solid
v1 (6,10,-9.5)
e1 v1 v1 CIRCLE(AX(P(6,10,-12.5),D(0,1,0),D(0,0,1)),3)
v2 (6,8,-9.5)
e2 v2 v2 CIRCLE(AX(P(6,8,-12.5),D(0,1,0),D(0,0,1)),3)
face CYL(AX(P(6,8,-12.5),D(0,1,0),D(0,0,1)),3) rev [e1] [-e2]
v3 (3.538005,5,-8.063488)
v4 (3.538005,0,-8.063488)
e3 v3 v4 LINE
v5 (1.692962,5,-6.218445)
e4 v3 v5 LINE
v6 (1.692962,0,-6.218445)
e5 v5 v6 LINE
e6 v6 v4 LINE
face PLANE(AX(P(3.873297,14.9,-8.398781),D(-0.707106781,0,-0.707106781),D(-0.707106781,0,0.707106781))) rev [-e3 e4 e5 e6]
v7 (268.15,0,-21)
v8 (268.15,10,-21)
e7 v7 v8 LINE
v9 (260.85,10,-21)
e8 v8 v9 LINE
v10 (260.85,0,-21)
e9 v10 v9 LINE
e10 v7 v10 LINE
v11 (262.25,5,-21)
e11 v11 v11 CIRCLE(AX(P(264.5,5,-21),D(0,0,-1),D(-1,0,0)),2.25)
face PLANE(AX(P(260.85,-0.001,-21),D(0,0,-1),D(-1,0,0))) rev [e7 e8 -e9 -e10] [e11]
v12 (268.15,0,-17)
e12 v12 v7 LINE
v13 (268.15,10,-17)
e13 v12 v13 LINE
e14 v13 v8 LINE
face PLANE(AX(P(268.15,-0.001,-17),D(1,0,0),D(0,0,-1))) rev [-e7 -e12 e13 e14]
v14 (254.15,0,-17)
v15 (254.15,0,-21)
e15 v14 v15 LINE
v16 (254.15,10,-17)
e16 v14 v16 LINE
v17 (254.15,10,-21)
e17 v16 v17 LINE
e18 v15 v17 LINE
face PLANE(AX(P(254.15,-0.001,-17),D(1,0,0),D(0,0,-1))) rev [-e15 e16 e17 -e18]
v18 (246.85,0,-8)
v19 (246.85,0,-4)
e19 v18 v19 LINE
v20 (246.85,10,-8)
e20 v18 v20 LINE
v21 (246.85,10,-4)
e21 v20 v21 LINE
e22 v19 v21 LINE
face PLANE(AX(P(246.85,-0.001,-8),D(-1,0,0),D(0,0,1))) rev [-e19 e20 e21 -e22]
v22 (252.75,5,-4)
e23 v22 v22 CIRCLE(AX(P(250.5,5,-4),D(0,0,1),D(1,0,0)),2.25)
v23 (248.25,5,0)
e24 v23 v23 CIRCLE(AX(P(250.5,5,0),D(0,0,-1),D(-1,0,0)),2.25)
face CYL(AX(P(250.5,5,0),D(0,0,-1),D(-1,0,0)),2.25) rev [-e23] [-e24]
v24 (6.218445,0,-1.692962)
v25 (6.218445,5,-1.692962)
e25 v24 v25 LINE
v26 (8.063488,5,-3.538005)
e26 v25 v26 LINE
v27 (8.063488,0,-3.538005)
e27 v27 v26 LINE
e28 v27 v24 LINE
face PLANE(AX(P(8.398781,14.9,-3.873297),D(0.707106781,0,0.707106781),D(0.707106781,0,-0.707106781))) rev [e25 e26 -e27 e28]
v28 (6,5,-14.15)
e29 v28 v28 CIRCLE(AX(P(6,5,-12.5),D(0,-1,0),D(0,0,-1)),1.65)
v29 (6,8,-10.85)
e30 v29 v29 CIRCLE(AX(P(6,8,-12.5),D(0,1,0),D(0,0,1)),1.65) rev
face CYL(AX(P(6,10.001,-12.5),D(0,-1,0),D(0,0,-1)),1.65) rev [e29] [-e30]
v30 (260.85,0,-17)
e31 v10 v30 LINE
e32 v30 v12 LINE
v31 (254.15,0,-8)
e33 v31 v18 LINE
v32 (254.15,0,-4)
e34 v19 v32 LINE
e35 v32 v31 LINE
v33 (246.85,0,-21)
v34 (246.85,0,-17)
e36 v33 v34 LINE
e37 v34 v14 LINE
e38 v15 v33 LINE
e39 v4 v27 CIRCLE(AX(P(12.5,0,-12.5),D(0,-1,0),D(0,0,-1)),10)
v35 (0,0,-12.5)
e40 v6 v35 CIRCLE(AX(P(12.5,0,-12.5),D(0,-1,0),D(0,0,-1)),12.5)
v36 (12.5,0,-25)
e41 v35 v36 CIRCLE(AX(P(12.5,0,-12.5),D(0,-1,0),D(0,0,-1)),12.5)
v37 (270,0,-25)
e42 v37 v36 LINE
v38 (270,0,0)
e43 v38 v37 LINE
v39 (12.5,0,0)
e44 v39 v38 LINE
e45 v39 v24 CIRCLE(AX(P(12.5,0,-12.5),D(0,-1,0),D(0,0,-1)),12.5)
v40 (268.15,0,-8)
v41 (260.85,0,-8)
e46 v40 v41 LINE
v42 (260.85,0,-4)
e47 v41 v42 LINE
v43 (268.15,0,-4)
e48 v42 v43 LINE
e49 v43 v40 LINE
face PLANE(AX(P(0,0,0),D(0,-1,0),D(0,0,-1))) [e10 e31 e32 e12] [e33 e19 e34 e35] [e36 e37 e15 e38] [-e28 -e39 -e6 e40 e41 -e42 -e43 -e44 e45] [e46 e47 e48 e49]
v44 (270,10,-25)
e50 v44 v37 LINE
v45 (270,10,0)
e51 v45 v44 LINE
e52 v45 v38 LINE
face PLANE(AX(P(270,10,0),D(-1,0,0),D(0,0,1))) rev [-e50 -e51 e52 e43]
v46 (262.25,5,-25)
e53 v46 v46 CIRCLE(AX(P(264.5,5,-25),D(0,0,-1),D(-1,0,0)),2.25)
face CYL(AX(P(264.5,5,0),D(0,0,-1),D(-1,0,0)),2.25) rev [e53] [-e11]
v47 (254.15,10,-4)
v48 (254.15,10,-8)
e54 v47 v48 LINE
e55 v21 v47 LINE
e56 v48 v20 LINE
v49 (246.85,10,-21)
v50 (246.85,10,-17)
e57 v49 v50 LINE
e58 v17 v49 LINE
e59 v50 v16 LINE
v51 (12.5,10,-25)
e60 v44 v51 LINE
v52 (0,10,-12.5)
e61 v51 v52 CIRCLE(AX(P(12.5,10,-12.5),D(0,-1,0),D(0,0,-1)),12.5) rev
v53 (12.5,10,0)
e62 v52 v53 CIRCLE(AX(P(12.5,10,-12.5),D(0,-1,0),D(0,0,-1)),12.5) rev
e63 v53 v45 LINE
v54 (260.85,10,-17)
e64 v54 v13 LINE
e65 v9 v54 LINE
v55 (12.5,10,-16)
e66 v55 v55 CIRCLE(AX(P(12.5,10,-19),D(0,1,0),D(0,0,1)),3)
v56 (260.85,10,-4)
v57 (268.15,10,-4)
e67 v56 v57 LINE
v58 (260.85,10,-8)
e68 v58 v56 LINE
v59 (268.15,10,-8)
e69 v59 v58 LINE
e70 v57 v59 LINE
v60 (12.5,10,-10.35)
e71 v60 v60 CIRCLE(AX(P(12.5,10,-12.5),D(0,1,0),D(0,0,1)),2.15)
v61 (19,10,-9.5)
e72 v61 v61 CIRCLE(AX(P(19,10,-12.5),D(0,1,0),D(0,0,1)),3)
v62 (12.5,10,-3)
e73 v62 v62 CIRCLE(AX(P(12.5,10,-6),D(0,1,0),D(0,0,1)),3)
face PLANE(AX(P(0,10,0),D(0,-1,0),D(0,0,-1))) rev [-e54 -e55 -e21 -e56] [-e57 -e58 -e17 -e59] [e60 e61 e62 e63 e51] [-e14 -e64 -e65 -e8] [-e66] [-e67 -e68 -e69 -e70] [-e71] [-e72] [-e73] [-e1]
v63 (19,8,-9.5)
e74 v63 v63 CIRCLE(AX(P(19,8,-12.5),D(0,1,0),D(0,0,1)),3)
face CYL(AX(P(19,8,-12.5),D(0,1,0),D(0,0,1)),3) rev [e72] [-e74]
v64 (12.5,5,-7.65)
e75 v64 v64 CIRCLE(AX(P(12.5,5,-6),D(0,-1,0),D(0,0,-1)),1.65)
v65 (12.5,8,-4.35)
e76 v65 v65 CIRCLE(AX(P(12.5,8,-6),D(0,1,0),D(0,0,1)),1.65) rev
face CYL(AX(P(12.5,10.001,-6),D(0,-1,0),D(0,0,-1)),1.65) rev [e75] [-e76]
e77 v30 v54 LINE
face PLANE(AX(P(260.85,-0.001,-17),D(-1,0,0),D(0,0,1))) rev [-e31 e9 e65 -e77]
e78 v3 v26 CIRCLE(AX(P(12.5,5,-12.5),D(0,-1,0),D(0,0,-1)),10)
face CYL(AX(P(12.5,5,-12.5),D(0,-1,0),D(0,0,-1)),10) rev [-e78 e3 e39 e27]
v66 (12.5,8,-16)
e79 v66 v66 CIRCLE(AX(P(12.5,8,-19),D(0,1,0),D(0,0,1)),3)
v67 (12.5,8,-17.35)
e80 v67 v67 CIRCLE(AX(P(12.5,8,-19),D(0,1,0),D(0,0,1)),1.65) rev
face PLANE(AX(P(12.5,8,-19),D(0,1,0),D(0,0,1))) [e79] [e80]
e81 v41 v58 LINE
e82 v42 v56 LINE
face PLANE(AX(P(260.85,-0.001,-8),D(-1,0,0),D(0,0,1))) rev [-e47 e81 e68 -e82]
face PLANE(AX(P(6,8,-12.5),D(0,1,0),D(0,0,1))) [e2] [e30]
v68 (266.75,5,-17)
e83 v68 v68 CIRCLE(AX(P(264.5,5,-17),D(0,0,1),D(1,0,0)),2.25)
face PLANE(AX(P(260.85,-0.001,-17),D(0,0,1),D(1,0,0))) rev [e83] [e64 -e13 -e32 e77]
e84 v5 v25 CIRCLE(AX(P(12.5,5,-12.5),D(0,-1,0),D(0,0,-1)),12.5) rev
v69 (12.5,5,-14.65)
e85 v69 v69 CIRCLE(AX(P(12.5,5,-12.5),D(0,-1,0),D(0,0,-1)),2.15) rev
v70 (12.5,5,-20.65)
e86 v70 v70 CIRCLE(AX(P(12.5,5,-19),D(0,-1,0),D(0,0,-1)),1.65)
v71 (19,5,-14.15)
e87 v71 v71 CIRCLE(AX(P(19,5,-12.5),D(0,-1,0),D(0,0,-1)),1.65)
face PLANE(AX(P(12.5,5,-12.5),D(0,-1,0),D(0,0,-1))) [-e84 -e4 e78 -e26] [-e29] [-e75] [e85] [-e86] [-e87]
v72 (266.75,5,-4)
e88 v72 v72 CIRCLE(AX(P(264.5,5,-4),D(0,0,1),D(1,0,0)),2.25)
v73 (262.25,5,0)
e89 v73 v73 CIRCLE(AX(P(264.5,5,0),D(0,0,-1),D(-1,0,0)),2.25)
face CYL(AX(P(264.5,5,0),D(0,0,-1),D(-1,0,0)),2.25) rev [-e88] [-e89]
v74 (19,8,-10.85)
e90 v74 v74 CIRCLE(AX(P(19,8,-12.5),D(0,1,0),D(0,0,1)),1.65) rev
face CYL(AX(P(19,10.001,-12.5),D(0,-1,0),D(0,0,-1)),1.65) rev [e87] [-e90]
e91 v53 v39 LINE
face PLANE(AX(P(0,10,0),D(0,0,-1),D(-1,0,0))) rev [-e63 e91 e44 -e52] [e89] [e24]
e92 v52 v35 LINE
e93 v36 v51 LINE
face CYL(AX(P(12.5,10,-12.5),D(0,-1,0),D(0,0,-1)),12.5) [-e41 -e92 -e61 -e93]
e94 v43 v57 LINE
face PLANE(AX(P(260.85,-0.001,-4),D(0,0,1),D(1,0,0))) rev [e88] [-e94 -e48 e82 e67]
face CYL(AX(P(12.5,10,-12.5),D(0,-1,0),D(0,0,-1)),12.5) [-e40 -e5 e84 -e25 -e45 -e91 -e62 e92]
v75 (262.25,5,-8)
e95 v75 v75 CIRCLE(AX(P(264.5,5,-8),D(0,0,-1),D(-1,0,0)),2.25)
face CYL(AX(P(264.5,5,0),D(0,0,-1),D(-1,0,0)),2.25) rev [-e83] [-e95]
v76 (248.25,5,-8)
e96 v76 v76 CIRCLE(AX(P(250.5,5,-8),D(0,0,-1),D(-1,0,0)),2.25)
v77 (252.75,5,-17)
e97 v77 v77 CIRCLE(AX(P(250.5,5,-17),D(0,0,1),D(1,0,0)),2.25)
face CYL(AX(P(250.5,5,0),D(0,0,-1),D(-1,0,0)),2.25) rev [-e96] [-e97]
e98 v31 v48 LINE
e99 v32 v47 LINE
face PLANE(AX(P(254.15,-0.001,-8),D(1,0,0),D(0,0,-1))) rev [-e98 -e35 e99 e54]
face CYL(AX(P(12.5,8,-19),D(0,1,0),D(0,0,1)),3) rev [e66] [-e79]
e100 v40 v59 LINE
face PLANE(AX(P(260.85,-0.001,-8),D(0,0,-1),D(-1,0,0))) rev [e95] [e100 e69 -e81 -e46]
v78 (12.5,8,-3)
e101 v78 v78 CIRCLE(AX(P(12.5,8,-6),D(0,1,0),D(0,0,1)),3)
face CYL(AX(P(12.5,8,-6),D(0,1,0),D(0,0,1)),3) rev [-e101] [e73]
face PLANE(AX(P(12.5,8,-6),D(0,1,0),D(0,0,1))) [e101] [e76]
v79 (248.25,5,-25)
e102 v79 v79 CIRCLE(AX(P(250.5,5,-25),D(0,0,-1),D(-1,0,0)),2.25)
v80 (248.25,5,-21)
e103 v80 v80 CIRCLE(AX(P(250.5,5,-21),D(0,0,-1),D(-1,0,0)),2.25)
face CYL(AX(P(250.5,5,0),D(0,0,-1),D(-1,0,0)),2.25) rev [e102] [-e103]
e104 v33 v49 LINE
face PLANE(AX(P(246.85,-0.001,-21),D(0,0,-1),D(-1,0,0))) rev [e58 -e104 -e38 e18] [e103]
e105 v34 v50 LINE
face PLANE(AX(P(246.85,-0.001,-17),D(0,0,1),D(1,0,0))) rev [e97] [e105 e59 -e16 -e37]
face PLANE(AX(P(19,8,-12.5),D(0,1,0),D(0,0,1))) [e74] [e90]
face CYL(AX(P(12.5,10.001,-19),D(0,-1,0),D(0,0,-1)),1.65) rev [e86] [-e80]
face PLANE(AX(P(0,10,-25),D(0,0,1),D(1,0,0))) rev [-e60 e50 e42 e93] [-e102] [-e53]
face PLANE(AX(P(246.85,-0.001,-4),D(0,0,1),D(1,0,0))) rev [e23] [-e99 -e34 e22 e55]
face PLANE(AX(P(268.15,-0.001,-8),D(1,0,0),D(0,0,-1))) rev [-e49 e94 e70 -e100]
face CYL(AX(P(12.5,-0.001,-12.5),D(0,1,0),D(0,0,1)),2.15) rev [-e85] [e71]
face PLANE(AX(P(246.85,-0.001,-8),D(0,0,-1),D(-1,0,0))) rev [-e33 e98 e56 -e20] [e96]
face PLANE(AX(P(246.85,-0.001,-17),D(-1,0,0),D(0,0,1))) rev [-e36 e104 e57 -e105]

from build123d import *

# Parameters (mm, degrees)
SKETCH1_W              = 270
SKETCH1_H              = 25
BOSS_EXTRUDE1_DEPTH    = 10
CUT_EXTRUDE1_REACH     = 273.339
SKETCH2_R              = 2.15
FILLET1_R              = 12.5
SKETCH3_R              = 2.25
CUT_EXTRUDE2_DEPTH     = 272.339271024
CUT_EXTRUDE5_REACH     = 273.339
SKETCH5_W              = 7.3
SKETCH5_H              = 4
SKETCH6_R              = 10
CUT_EXTRUDE6_DEPTH     = 5
CUT_EXTRUDE7_REACH     = 273.201
SKETCH7_R              = 1.65
CUT_EXTRUDE8_START     = -3.2
CUT_EXTRUDE8_OUTLINE_W = 6
CUT_EXTRUDE8_OUTLINE_H = 6
CUT_EXTRUDE8_DEPTH     = 6.4
SKETCH9_R              = 3
CUT_EXTRUDE9_DEPTH     = 2


# Read off the part's stored shape, not the designer's step: Cut-Extrude8
with BuildPart() as part:
    # Sketch1 → Boss-Extrude1 (new body)
    with BuildSketch(Plane(origin=(0, 0, 0), x_dir=(1, 0, 0), z_dir=(0, 1, 0))):
        with Locations((135, 12.5)):
            Rectangle(SKETCH1_W, SKETCH1_H)
    extrude(amount=BOSS_EXTRUDE1_DEPTH)

    # Sketch2 → Cut-Extrude1 (cut, up to next)
    with BuildSketch(Plane(origin=(0, 10, 0), x_dir=(1, 0, 0), z_dir=(0, 1, 0)), mode=Mode.PRIVATE) as cut_extrude1_sk1:
        with Locations(Location((12.5, 12.5, 0), (0, 0, 270))):
            Circle(SKETCH2_R)
    cut_extrude1_tool1 = extrude(cut_extrude1_sk1.sketch, amount=-CUT_EXTRUDE1_REACH, mode=Mode.PRIVATE) & part.part
    add(cut_extrude1_tool1.solids().sort_by_distance((12.5, 10, -12.5))[0], mode=Mode.SUBTRACT)

    # Fillet1
    fillet1_edges = [part.edges().sort_by_distance(p)[0] for p in [
        (0, 5, 0),
        (0, 5, -25),
    ]]
    fillet(fillet1_edges, radius=FILLET1_R - 0.0001)  # a hair under: the kernel refuses the full size

    # Sketch3 → Cut-Extrude2 (cut, through all)
    with BuildSketch(Plane(origin=(0, 0, -25), x_dir=(-1, 0, 0), z_dir=(0, 0, -1))):
        with Locations((-264.5, 5)):
            Circle(SKETCH3_R)
        with Locations((-250.5, 5)):
            Circle(SKETCH3_R)
    extrude(amount=-CUT_EXTRUDE2_DEPTH, mode=Mode.SUBTRACT)

    # Sketch5 → Cut-Extrude5 (cut, up to next)
    with BuildSketch(Plane(origin=(0, 10, 0), x_dir=(1, 0, 0), z_dir=(0, 1, 0)), mode=Mode.PRIVATE) as cut_extrude5_sk1:
        with Locations((264.5, 19)):
            Rectangle(SKETCH5_W, SKETCH5_H)
    cut_extrude5_tool1 = extrude(cut_extrude5_sk1.sketch, amount=-CUT_EXTRUDE5_REACH, mode=Mode.PRIVATE) & part.part
    # Sketch5 → Cut-Extrude5 (cut, up to next)
    with BuildSketch(Plane(origin=(0, 10, 0), x_dir=(1, 0, 0), z_dir=(0, 1, 0)), mode=Mode.PRIVATE) as cut_extrude5_sk2:
        with Locations((264.5, 6)):
            Rectangle(SKETCH5_W, SKETCH5_H)
    cut_extrude5_tool2 = extrude(cut_extrude5_sk2.sketch, amount=-CUT_EXTRUDE5_REACH, mode=Mode.PRIVATE) & part.part
    # Sketch5 → Cut-Extrude5 (cut, up to next)
    with BuildSketch(Plane(origin=(0, 10, 0), x_dir=(1, 0, 0), z_dir=(0, 1, 0)), mode=Mode.PRIVATE) as cut_extrude5_sk3:
        with Locations((250.5, 19)):
            Rectangle(SKETCH5_W, SKETCH5_H)
    cut_extrude5_tool3 = extrude(cut_extrude5_sk3.sketch, amount=-CUT_EXTRUDE5_REACH, mode=Mode.PRIVATE) & part.part
    # Sketch5 → Cut-Extrude5 (cut, up to next)
    with BuildSketch(Plane(origin=(0, 10, 0), x_dir=(1, 0, 0), z_dir=(0, 1, 0)), mode=Mode.PRIVATE) as cut_extrude5_sk4:
        with Locations((250.5, 6)):
            Rectangle(SKETCH5_W, SKETCH5_H)
    cut_extrude5_tool4 = extrude(cut_extrude5_sk4.sketch, amount=-CUT_EXTRUDE5_REACH, mode=Mode.PRIVATE) & part.part
    add(cut_extrude5_tool1.solids().sort_by_distance((264.5, 10, -19))[0], mode=Mode.SUBTRACT)
    add(cut_extrude5_tool2.solids().sort_by_distance((264.5, 10, -6))[0], mode=Mode.SUBTRACT)
    add(cut_extrude5_tool3.solids().sort_by_distance((250.5, 10, -19))[0], mode=Mode.SUBTRACT)
    add(cut_extrude5_tool4.solids().sort_by_distance((250.5, 10, -6))[0], mode=Mode.SUBTRACT)

    # Sketch6 → Cut-Extrude6 (cut)
    with BuildSketch(Plane.XZ):
        with Locations(Location((12.5, -12.5, 0), (0, 0, 270))):
            Circle(SKETCH6_R)
    extrude(amount=-CUT_EXTRUDE6_DEPTH, mode=Mode.SUBTRACT)

    # Sketch7 → Cut-Extrude7 (cut, up to next)
    with BuildSketch(Plane.XZ.offset(-5), mode=Mode.PRIVATE) as cut_extrude7_sk1:
        with Locations(Location((12.5, -6, 0), (0, 0, 270))):
            Circle(SKETCH7_R)
    cut_extrude7_tool1 = extrude(cut_extrude7_sk1.sketch, amount=-CUT_EXTRUDE7_REACH, mode=Mode.PRIVATE) & part.part
    # Sketch7 → Cut-Extrude7 (cut, up to next)
    with BuildSketch(Plane.XZ.offset(-5), mode=Mode.PRIVATE) as cut_extrude7_sk2:
        with Locations(Location((19, -12.5, 0), (0, 0, 270))):
            Circle(SKETCH7_R)
    cut_extrude7_tool2 = extrude(cut_extrude7_sk2.sketch, amount=-CUT_EXTRUDE7_REACH, mode=Mode.PRIVATE) & part.part
    # Sketch7 → Cut-Extrude7 (cut, up to next)
    with BuildSketch(Plane.XZ.offset(-5), mode=Mode.PRIVATE) as cut_extrude7_sk3:
        with Locations(Location((12.5, -19, 0), (0, 0, 270))):
            Circle(SKETCH7_R)
    cut_extrude7_tool3 = extrude(cut_extrude7_sk3.sketch, amount=-CUT_EXTRUDE7_REACH, mode=Mode.PRIVATE) & part.part
    # Sketch7 → Cut-Extrude7 (cut, up to next)
    with BuildSketch(Plane.XZ.offset(-5), mode=Mode.PRIVATE) as cut_extrude7_sk4:
        with Locations(Location((6, -12.5, 0), (0, 0, 270))):
            Circle(SKETCH7_R)
    cut_extrude7_tool4 = extrude(cut_extrude7_sk4.sketch, amount=-CUT_EXTRUDE7_REACH, mode=Mode.PRIVATE) & part.part
    add(cut_extrude7_tool1.solids().sort_by_distance((12.5, 5, -6))[0], mode=Mode.SUBTRACT)
    add(cut_extrude7_tool2.solids().sort_by_distance((19, 5, -12.5))[0], mode=Mode.SUBTRACT)
    add(cut_extrude7_tool3.solids().sort_by_distance((12.5, 5, -19))[0], mode=Mode.SUBTRACT)
    add(cut_extrude7_tool4.solids().sort_by_distance((6, 5, -12.5))[0], mode=Mode.SUBTRACT)

    # Cut-Extrude8 outline → Cut-Extrude8 (cut)
    with BuildSketch(Plane(origin=(0, 0, 0), x_dir=(0.707106781186548, 0, -0.707106781186547), z_dir=(0.707106781186547, 0, 0.707106781186548)).offset(CUT_EXTRUDE8_START)):
        with Locations((7, 2)):
            Rectangle(CUT_EXTRUDE8_OUTLINE_W, CUT_EXTRUDE8_OUTLINE_H)
    extrude(amount=CUT_EXTRUDE8_DEPTH, mode=Mode.SUBTRACT)

    # Sketch9 → Cut-Extrude9 (cut)
    with BuildSketch(Plane(origin=(0, 10, 0), x_dir=(1, 0, 0), z_dir=(0, 1, 0))):
        with Locations(Location((12.5, 19, 0), (0, 0, 270))):
            Circle(SKETCH9_R)
        with Locations(Location((19, 12.5, 0), (0, 0, 270))):
            Circle(SKETCH9_R)
        with Locations(Location((12.5, 6, 0), (0, 0, 270))):
            Circle(SKETCH9_R)
        with Locations(Location((6, 12.5, 0), (0, 0, 270))):
            Circle(SKETCH9_R)
    extrude(amount=-CUT_EXTRUDE9_DEPTH, mode=Mode.SUBTRACT)


solid = part.part
